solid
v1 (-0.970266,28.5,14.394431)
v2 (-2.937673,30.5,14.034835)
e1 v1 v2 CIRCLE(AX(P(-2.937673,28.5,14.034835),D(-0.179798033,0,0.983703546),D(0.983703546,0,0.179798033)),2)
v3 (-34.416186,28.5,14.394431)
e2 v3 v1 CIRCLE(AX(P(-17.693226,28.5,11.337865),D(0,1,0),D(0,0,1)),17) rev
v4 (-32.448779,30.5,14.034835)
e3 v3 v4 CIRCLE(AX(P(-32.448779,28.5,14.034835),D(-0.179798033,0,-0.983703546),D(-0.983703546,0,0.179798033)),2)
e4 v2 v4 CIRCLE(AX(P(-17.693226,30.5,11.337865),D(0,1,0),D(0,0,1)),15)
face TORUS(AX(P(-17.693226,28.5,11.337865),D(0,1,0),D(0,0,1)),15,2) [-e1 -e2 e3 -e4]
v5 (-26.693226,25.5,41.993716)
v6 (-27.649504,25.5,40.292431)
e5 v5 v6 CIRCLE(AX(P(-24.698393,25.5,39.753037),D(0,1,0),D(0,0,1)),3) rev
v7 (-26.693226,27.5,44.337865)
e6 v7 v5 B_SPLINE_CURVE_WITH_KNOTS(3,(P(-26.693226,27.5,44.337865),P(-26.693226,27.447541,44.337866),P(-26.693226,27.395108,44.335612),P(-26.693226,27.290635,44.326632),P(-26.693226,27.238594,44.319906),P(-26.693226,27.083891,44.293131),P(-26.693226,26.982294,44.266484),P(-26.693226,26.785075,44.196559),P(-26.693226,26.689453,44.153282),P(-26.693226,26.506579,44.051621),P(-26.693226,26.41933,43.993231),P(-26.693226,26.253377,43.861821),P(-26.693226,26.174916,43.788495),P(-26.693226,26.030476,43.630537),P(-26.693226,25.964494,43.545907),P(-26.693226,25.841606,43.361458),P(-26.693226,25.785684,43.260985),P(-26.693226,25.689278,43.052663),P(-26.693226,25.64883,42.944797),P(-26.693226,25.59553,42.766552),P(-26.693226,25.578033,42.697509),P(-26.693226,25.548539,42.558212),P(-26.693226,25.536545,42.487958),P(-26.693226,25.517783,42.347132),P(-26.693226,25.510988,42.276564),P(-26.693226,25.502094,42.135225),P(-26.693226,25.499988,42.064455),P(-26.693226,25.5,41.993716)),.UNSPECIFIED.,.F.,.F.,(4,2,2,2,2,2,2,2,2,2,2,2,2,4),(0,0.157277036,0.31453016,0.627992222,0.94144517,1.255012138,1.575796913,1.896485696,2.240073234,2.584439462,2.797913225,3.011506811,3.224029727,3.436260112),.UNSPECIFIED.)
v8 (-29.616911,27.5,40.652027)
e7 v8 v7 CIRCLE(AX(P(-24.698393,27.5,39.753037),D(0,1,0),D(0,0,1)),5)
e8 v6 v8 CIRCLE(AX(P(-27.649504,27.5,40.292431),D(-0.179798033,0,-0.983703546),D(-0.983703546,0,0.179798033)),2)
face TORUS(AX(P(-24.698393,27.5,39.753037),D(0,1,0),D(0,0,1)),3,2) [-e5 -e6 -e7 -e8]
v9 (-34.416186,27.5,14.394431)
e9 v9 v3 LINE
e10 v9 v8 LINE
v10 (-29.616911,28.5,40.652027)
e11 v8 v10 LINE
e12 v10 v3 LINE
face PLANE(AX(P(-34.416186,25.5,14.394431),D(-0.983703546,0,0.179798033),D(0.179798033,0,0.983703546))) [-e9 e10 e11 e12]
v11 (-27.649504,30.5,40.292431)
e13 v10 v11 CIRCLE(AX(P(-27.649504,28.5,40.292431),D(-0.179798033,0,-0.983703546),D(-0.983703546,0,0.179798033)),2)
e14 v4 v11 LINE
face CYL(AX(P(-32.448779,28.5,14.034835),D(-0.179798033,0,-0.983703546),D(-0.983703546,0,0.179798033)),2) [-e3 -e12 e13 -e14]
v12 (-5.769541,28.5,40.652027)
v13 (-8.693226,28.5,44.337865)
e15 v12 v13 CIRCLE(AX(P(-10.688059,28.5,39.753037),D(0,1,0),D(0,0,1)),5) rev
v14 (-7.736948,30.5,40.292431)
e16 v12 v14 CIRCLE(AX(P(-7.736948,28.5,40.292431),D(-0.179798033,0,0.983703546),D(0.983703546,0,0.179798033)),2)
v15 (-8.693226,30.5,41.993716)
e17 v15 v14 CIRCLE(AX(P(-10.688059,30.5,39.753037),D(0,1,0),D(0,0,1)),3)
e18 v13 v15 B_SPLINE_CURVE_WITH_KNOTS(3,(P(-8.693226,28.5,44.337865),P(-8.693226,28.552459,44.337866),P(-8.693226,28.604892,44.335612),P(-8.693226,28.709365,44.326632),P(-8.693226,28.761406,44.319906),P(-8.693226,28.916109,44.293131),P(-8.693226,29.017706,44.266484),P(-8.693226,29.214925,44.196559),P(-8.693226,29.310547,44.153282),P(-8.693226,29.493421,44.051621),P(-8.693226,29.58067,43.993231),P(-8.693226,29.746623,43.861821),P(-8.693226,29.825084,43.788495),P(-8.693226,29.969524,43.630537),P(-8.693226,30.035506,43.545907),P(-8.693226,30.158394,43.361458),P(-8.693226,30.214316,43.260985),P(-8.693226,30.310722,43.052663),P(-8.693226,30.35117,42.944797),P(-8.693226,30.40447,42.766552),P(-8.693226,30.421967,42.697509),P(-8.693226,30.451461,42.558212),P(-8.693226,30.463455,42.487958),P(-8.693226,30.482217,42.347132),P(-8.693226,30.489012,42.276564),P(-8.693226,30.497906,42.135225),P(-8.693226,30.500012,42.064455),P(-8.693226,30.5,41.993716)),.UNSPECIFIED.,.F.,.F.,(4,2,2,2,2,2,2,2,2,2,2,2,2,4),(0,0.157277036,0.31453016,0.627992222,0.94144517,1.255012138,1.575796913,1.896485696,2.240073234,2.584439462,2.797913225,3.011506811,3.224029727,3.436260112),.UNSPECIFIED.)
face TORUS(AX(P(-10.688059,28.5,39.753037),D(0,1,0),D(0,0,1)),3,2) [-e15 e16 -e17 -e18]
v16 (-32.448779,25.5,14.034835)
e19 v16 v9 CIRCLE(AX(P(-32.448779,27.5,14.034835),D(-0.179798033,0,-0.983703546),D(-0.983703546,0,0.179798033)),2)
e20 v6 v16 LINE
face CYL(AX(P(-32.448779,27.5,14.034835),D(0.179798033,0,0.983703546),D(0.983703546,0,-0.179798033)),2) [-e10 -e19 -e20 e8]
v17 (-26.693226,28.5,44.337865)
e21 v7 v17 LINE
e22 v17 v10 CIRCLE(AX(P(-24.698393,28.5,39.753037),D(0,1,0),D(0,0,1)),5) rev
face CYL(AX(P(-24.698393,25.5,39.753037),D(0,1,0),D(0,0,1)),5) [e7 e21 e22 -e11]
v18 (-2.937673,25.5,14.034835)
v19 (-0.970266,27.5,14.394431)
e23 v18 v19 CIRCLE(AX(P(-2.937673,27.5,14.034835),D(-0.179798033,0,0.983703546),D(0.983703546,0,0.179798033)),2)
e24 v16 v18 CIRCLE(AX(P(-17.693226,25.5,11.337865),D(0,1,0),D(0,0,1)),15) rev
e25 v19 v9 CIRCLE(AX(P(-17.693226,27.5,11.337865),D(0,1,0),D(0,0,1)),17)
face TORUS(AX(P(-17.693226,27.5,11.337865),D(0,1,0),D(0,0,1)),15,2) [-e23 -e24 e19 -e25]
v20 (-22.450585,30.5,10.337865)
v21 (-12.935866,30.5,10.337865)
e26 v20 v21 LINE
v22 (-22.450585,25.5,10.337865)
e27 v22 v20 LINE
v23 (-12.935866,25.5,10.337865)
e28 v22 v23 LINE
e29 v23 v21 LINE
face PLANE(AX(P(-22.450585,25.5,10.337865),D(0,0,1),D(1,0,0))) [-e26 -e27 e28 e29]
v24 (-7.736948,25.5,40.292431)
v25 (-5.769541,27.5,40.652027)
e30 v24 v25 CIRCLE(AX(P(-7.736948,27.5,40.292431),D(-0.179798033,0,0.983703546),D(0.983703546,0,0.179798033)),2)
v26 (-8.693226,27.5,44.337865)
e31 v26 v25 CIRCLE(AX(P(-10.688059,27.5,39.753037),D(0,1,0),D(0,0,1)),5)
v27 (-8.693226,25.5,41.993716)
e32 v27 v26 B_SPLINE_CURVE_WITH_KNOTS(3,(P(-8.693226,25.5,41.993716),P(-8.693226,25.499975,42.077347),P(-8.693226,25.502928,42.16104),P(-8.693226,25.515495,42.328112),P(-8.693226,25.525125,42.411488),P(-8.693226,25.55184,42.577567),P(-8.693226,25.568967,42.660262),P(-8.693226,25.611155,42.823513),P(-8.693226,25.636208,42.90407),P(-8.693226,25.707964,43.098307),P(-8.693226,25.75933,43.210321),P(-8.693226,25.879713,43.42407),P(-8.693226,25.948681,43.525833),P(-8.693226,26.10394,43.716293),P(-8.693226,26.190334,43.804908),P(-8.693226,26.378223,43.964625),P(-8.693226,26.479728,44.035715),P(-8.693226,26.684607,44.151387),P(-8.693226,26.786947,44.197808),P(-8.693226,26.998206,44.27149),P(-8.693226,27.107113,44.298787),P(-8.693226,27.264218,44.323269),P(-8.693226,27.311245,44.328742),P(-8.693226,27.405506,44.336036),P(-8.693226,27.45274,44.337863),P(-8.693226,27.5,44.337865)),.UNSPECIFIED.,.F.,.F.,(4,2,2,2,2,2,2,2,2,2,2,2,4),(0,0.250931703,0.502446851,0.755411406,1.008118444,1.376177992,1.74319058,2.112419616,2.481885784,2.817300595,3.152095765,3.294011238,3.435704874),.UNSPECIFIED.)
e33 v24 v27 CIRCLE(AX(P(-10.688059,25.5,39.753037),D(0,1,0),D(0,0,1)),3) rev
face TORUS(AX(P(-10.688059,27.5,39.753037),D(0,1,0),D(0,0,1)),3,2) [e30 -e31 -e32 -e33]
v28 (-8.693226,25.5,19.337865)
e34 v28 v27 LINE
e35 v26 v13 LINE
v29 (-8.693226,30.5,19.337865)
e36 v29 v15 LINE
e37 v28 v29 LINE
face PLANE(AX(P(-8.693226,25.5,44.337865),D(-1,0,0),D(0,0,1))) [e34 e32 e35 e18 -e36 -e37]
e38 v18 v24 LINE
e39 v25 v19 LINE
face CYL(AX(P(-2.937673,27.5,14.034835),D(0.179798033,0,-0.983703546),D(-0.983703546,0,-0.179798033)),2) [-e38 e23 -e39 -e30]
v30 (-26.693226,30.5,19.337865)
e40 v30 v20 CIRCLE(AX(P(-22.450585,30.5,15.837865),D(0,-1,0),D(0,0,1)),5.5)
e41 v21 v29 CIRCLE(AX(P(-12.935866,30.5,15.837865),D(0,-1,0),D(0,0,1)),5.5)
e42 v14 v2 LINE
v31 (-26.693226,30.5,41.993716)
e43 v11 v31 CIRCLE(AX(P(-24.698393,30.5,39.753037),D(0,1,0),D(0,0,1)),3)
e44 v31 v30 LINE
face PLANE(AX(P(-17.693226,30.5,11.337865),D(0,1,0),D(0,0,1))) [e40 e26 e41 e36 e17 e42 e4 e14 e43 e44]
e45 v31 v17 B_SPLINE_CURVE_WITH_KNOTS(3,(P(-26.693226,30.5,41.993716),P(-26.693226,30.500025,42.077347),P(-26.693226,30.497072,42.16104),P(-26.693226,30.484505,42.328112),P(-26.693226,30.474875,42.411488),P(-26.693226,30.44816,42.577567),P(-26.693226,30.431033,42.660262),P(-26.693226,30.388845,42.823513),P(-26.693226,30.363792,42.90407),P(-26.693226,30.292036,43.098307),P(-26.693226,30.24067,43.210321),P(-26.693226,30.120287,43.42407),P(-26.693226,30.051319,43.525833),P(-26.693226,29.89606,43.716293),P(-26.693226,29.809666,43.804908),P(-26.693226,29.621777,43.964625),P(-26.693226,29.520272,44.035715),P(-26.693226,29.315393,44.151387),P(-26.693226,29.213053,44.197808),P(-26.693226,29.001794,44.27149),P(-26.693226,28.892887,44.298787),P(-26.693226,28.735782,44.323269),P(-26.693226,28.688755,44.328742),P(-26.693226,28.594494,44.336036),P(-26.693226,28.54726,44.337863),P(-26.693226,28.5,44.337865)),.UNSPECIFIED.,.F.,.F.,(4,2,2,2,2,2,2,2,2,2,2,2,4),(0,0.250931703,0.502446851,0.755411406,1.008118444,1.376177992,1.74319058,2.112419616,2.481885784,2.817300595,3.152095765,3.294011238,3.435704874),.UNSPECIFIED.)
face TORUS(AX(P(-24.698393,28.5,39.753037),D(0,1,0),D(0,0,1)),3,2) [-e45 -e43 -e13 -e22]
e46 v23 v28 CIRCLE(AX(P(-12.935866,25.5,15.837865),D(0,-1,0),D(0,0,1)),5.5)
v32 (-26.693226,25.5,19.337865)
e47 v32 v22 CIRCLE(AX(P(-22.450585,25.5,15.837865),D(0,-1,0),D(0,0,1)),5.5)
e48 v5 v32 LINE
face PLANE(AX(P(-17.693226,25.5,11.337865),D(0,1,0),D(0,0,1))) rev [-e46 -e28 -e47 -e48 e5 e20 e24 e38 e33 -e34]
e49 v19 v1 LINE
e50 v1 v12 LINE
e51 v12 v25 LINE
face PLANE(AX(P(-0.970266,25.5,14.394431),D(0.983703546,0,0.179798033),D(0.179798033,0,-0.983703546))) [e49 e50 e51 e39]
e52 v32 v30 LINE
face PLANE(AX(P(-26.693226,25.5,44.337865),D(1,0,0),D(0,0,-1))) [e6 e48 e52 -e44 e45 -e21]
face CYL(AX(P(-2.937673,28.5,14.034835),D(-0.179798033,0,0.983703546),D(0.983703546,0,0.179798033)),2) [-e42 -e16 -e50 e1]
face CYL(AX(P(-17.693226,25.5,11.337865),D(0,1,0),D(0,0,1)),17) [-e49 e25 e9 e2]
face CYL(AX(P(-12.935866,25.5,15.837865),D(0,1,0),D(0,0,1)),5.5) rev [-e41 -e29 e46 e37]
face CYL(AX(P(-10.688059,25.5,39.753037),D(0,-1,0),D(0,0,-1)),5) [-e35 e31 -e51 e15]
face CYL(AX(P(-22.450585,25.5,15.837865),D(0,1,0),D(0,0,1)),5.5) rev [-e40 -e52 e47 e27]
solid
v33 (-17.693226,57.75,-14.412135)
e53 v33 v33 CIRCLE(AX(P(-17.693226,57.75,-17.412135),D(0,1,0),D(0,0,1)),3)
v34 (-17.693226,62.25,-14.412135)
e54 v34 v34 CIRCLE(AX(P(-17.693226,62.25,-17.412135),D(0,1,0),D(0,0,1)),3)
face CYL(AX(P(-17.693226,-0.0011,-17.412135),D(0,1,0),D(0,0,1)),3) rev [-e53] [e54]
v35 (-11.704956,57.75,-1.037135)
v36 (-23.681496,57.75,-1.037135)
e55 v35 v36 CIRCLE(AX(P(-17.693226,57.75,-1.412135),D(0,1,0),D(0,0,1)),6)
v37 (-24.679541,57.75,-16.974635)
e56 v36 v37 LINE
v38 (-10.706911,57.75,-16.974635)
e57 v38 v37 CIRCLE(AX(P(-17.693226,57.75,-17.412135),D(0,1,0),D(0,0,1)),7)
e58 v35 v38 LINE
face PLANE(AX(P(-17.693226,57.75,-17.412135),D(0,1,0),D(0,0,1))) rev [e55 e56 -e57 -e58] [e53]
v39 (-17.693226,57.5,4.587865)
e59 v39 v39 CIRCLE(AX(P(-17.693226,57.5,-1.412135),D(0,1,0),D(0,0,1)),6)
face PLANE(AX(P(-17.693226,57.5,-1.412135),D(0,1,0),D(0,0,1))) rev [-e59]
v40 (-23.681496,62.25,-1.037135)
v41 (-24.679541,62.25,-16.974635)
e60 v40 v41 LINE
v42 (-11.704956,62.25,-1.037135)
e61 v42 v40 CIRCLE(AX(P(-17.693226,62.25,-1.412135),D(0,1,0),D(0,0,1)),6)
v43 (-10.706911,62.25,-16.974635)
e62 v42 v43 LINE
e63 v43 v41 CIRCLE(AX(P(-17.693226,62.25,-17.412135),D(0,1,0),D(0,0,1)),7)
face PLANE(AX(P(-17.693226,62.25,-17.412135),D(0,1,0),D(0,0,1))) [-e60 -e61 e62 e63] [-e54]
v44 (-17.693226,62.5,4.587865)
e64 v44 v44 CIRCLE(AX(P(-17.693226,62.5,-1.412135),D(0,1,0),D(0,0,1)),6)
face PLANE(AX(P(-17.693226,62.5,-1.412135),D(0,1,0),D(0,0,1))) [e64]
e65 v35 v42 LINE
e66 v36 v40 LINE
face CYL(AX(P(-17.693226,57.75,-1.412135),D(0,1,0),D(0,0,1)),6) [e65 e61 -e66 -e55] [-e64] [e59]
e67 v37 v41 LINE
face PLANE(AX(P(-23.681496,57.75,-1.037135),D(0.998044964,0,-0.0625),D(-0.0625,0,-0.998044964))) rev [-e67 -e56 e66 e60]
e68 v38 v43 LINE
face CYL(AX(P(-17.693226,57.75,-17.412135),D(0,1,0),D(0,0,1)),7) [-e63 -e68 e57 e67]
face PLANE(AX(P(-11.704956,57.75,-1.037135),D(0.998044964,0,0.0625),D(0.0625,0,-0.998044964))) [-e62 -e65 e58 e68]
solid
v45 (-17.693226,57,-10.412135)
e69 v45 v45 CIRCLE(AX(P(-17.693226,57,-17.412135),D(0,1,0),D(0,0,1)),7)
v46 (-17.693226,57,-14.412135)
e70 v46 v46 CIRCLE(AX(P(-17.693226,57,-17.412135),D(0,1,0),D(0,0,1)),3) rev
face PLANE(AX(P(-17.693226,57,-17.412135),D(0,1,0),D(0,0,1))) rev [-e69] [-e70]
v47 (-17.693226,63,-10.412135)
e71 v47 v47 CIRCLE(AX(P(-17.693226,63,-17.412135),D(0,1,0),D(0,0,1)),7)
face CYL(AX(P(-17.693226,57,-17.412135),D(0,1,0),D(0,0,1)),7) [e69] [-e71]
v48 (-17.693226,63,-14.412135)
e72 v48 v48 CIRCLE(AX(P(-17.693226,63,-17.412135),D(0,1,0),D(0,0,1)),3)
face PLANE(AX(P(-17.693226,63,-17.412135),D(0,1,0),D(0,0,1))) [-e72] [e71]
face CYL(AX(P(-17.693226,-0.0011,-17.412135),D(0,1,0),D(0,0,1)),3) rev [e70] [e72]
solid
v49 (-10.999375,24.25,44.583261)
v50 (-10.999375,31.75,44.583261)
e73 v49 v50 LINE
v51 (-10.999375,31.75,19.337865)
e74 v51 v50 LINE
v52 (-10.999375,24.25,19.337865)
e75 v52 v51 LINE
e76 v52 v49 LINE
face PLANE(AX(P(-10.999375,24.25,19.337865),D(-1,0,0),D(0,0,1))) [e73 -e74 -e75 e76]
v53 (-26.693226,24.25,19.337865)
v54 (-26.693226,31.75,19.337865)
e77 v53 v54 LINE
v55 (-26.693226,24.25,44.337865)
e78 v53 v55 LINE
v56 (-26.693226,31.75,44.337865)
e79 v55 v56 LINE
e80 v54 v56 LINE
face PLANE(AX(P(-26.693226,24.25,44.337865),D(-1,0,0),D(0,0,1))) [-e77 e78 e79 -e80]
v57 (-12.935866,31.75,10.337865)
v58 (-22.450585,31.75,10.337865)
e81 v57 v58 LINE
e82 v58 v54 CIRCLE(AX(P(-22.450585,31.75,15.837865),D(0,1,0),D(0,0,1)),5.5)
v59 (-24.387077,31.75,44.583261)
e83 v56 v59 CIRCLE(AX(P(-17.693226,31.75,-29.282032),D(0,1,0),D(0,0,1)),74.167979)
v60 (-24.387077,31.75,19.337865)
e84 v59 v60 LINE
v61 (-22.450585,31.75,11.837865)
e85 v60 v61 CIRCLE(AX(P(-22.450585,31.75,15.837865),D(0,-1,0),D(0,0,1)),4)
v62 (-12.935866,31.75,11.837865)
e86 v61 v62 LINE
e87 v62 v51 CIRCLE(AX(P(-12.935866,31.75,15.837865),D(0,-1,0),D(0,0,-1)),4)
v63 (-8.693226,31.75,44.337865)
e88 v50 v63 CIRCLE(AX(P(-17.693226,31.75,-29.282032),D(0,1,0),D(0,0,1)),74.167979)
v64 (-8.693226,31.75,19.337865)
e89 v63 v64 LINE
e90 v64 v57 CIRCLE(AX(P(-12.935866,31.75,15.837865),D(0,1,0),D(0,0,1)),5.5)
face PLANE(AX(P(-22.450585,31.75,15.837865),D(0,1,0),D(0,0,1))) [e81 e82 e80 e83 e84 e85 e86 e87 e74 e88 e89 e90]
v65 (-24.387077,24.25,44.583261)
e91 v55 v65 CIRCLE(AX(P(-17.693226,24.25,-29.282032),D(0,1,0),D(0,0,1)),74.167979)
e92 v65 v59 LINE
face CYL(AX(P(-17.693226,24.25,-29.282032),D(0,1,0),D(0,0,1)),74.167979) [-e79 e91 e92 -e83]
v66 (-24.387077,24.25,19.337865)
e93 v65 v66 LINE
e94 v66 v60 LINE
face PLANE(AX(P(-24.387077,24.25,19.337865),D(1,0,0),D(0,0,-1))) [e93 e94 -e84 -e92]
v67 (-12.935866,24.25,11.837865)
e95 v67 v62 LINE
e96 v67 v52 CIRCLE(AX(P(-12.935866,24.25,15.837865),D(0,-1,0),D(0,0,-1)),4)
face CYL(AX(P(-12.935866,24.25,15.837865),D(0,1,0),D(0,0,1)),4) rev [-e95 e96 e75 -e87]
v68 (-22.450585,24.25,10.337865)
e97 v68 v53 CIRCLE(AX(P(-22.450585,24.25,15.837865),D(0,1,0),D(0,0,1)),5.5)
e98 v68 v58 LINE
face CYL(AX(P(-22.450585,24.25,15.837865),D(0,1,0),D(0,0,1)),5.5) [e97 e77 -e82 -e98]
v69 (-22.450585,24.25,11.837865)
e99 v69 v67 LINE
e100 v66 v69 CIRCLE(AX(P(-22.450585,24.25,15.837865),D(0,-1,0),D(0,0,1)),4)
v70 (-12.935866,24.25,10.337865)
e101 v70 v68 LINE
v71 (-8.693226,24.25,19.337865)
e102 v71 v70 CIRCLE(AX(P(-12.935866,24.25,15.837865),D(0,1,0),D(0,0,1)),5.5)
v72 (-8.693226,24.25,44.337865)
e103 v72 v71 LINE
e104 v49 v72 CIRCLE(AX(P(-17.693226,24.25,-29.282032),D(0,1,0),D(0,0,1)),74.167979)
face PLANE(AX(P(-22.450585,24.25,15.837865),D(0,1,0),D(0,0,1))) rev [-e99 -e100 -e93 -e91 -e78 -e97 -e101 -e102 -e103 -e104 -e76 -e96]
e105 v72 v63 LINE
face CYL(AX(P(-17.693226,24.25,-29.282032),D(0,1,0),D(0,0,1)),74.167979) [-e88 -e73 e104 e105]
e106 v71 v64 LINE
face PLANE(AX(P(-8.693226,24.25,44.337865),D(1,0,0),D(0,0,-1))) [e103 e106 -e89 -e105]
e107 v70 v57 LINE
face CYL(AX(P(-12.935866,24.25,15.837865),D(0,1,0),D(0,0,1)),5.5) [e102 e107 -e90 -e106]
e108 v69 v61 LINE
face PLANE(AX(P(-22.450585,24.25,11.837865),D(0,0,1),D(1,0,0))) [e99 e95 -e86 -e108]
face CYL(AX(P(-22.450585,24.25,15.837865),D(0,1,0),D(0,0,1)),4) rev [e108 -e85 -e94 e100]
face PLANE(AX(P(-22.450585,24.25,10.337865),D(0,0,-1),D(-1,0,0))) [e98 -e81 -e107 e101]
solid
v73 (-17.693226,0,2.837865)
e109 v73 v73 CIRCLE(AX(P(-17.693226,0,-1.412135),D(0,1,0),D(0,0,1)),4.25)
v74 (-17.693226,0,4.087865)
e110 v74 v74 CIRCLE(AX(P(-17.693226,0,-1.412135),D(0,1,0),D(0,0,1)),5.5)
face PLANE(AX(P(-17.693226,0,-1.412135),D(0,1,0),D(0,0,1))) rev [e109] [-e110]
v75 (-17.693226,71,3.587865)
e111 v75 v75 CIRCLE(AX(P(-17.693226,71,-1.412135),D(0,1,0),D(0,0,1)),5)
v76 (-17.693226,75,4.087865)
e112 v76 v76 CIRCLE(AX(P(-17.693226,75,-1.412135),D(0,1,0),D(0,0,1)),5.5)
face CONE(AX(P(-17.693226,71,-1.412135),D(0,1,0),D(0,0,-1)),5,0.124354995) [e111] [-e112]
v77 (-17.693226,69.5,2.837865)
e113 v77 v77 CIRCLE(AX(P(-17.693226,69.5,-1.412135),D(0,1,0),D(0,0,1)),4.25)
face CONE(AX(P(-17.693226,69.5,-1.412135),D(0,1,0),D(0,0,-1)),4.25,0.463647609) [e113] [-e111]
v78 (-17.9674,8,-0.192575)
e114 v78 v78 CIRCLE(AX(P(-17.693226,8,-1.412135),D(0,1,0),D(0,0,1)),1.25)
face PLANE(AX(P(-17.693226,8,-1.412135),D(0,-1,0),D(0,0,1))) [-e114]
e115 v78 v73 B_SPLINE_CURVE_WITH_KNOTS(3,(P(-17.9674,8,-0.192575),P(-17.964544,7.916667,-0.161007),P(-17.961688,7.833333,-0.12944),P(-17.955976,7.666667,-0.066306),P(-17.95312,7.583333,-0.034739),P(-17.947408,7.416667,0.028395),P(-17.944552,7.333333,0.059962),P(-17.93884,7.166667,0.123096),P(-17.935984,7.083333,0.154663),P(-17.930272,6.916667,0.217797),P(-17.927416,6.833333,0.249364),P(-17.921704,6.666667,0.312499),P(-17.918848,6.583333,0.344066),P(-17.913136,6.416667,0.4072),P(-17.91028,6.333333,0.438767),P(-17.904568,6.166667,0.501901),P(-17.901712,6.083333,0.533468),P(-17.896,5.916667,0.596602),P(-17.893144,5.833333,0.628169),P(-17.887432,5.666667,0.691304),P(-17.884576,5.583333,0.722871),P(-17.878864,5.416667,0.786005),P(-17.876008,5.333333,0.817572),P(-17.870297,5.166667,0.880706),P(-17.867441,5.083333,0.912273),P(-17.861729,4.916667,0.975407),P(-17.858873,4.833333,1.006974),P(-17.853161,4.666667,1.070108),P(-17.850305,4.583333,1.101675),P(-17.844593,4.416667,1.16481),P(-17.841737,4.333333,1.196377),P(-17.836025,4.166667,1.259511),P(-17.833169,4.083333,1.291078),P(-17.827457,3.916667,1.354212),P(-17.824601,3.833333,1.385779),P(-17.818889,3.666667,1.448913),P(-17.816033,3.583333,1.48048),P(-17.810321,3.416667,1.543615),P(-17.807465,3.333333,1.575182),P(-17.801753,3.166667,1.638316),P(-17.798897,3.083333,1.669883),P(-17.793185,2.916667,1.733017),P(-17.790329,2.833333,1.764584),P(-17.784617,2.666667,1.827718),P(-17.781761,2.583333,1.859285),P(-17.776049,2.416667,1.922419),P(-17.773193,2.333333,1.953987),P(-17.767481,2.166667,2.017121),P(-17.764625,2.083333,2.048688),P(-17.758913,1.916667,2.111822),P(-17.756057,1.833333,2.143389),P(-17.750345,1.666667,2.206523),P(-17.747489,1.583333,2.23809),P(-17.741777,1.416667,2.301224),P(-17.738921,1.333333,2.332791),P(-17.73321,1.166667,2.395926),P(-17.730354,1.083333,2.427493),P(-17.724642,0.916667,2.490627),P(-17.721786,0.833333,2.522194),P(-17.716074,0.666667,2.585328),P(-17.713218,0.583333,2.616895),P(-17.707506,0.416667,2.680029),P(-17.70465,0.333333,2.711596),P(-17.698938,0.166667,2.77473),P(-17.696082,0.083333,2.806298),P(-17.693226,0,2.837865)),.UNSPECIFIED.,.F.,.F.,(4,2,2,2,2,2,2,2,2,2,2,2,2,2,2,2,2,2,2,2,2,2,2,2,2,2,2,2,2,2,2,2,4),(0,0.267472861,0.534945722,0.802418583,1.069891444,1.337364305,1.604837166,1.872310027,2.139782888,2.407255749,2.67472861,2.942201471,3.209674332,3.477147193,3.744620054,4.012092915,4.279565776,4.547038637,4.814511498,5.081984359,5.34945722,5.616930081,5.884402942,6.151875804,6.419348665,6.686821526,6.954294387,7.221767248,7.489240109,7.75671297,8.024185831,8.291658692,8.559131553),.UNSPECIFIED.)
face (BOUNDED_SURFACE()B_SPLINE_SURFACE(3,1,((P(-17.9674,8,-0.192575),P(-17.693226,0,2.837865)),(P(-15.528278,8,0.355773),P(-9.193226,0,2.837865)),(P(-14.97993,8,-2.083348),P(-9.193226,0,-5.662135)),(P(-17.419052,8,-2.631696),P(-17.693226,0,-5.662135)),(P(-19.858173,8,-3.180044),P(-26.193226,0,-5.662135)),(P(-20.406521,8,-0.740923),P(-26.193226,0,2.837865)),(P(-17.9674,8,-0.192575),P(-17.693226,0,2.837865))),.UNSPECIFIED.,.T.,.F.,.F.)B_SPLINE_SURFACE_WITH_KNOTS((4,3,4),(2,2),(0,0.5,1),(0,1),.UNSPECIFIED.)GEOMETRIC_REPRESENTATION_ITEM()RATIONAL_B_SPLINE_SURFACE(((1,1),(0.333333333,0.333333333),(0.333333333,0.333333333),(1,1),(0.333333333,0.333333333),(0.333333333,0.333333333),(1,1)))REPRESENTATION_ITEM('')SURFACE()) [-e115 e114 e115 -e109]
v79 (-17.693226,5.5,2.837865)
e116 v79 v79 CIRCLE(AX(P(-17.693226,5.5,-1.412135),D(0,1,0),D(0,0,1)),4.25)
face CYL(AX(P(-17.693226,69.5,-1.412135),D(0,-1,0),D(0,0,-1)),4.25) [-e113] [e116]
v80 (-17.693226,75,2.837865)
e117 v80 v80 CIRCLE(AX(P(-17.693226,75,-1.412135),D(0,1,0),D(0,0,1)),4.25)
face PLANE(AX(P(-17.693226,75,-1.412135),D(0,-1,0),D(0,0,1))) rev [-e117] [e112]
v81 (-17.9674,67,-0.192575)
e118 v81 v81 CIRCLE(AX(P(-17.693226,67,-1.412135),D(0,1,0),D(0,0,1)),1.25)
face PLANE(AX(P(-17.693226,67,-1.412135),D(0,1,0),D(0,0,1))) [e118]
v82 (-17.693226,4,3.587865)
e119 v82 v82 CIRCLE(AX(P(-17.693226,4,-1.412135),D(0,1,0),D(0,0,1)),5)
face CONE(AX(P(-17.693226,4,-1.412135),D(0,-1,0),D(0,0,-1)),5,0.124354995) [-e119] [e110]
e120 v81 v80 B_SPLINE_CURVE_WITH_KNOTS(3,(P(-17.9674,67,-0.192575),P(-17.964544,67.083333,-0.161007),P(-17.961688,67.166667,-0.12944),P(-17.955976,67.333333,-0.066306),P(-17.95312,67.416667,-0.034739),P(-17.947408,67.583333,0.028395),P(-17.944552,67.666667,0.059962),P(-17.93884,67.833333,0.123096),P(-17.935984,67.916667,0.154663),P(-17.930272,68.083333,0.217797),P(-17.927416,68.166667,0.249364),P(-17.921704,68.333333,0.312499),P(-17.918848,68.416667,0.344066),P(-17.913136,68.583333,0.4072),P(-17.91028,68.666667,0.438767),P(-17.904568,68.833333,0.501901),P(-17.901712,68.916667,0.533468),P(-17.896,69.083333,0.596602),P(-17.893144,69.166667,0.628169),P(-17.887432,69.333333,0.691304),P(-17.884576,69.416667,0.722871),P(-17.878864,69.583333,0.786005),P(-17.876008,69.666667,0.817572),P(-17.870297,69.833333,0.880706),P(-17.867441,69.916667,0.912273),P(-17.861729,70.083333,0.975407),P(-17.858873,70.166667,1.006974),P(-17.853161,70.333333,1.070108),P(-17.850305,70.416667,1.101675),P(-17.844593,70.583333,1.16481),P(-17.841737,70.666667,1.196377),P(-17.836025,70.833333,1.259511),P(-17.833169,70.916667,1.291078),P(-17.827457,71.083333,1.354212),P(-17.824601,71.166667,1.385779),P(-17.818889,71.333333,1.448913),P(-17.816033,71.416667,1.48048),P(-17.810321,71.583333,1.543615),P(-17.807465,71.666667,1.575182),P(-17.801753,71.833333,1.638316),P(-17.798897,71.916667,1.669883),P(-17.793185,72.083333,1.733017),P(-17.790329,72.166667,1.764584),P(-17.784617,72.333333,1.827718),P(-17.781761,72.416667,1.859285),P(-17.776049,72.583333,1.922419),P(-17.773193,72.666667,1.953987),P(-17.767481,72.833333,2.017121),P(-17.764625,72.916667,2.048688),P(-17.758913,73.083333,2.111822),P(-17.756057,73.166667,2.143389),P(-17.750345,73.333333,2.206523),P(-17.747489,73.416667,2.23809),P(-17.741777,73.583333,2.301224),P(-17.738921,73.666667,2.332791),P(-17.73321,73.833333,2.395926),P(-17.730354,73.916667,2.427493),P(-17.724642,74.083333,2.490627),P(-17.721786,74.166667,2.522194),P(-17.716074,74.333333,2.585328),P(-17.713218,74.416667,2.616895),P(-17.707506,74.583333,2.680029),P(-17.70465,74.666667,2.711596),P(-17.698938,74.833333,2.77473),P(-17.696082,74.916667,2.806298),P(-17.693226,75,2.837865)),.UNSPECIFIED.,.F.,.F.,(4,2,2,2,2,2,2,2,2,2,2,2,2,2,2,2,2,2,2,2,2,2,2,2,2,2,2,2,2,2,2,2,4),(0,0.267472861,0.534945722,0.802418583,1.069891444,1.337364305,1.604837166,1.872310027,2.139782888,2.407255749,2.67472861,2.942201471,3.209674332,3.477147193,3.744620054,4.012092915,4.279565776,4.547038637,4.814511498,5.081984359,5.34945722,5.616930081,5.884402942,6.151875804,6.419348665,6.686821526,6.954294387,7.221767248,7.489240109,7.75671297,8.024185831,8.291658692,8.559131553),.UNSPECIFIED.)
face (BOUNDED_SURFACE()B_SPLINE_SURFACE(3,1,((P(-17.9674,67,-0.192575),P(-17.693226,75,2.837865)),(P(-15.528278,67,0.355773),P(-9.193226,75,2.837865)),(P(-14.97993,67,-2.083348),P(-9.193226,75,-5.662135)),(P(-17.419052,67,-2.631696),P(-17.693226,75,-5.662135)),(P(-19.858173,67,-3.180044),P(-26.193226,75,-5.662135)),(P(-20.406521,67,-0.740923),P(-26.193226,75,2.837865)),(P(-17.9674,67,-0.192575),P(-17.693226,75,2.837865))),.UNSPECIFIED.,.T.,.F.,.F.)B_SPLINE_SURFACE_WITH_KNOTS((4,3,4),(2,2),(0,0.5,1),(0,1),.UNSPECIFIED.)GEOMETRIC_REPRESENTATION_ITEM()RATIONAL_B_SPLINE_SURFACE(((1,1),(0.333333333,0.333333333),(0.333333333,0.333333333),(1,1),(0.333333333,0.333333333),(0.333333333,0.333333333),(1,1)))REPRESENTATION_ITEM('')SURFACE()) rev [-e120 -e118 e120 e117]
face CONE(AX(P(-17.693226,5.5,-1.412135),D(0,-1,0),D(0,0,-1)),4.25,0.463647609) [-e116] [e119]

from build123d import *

# Parameters (mm, degrees)
CROQUIS2_R                   = 5
CROQUIS1_R                   = 5.5
CROQUIS2_2_R                 = 5
CROQUIS3_R                   = 4.25
CROQUIS3_2_R                 = 4.25
SALIENTE_EXTRUIR1_DEPTH      = 64
SALIENTE_EXTRUIR2_DEPTH      = 2.5
SALIENTE_EXTRUIR2_DEPTH_BACK = 2.5
REDONDEO1_R                  = 5
REDONDEO2_R                  = 5
REDONDEO3_R                  = 2
REDONDEO4_R                  = 2
SALIENTE_EXTRUIR3_DEPTH      = 3.75
SALIENTE_EXTRUIR3_DEPTH_BACK = 3.75
SALIENTE_EXTRUIR4_DEPTH      = 3
SALIENTE_EXTRUIR4_DEPTH_BACK = 3
CROQUIS9_R                   = 7
SALIENTE_EXTRUIR5_DEPTH      = 2.25
SALIENTE_EXTRUIR5_DEPTH_BACK = 2.25
SALIENTE_EXTRUIR6_DEPTH      = 2.5
SALIENTE_EXTRUIR6_DEPTH_BACK = 2.5
CROQUIS8_R                   = 6
CORTAR_EXTRUIR1_START        = -6
CROQUIS11_R                  = 3
CORTAR_EXTRUIR1_DEPTH        = 6


with BuildPart() as part:
    # Croquis2 → Recubrir1 section 0
    with BuildSketch(Plane(origin=(0, 4, 0), x_dir=(1, 0, 0), z_dir=(0, 1, 0))):
        with Locations((-17.693226, 1.412135)):
            Circle(CROQUIS2_R)
    # Croquis1 → Recubrir1 section 1
    with BuildSketch(Plane(origin=(0, 0, 0), x_dir=(1, 0, 0), z_dir=(0, 1, 0))):
        with Locations((-17.693226, 1.412135)):
            Circle(CROQUIS1_R)
    recubrir1 = loft()

    # Croquis2<2> → Recubrir3 section 0
    with BuildSketch(Plane(origin=(0, 4, 0), x_dir=(1, 0, 0), z_dir=(0, 1, 0))):
        with Locations((-17.693226, 1.412135)):
            Circle(CROQUIS2_2_R)
    # Croquis3 → Recubrir3 section 1
    with BuildSketch(Plane(origin=(0, 5.5, 0), x_dir=(1, 0, 0), z_dir=(0, 1, 0))):
        with Locations((-17.693226, 1.412135)):
            Circle(CROQUIS3_R)
    recubrir3 = loft()

    # Croquis3<2> → Saliente-Extruir1 (add)
    with BuildSketch(Plane(origin=(0, 5.5, 0), x_dir=(1, 0, 0), z_dir=(0, 1, 0))):
        with Locations(Location((-17.693226, 1.412135, 0), (0, 0, 270))):
            Circle(CROQUIS3_2_R)
    extrude(amount=SALIENTE_EXTRUIR1_DEPTH)

    # Simetría1: Recubrir3 across plane
    add(recubrir3.mirror(Plane.ZX.offset(37.5)))

    # Simetría2: Recubrir1 across plane
    add(recubrir1.mirror(Plane.ZX.offset(37.5)))

    # Cortar-Recubrir1: read off the stored shape, not the designer's step
    # Cortar-Recubrir1: loft between two sections, ruled curve by curve
    cortar_recubrir1_from = [
        Edge.make_bspline([(-17.9674, 67, -0.192575), (-15.528278, 67, 0.355773), (-14.97993, 67, -2.083348), (-17.419052, 67, -2.631696), (-19.858173, 67, -3.180044), (-20.406521, 67, -0.740923), (-17.9674, 67, -0.192575)], [0, 0, 0, 0, 0.5, 0.5, 0.5, 1, 1, 1, 1], 3, [1, 0.333333, 0.333333, 1, 0.333333, 0.333333, 1]),
    ]
    cortar_recubrir1_to = [
        Edge.make_bspline([(-17.693226, 75, 2.837865), (-9.193226, 75, 2.837865), (-9.193226, 75, -5.662135), (-17.693226, 75, -5.662135), (-26.193226, 75, -5.662135), (-26.193226, 75, 2.837865), (-17.693226, 75, 2.837865)], [0, 0, 0, 0, 0.5, 0.5, 0.5, 1, 1, 1, 1], 3, [1, 0.333333, 0.333333, 1, 0.333333, 0.333333, 1]),
    ]
    cortar_recubrir1 = Solid(Shell([*[Face.make_surface_from_curves(cortar_recubrir1_from[k], cortar_recubrir1_to[k]) for k in range(1)], Face(Wire(cortar_recubrir1_from)), Face(Wire(cortar_recubrir1_to))]))
    add(cortar_recubrir1, mode=Mode.SUBTRACT)

    # Simetría3: Cortar-Recubrir1 across plane
    add(cortar_recubrir1.mirror(Plane.ZX.offset(37.5)), mode=Mode.SUBTRACT)


with BuildPart() as body_2:
    # Croquis5 → Saliente-Extruir2 (new, two sides: drawn at the far end of the back side and taken through both)
    with BuildSketch(Plane(origin=(0, 28, 0), x_dir=(1, 0, 0), z_dir=(0, 1, 0)).offset(-SALIENTE_EXTRUIR2_DEPTH_BACK)):
        with BuildLine():
            Line((-0.970266, -14.394431), (-6.443226, -44.337865))
            Line((-6.443226, -44.337865), (-8.693226, -44.337865))
            Line((-8.693226, -44.337865), (-8.693226, -19.337865))
            ThreePointArc((-8.693226, -19.337865), (-7.960929, -13.492657), (-12.935866, -10.337865))
            Line((-12.935866, -10.337865), (-22.450585, -10.337865))
            ThreePointArc((-22.450585, -10.337865), (-27.425522, -13.492657), (-26.693226, -19.337865))
            Line((-26.693226, -19.337865), (-26.693226, -44.337865))
            Line((-26.693226, -44.337865), (-28.943226, -44.337865))
            Line((-28.943226, -44.337865), (-34.416186, -14.394431))
            ThreePointArc((-34.416186, -14.394431), (-17.693226, 5.662135), (-0.970266, -14.394431))
        make_face()
    extrude(amount=SALIENTE_EXTRUIR2_DEPTH + SALIENTE_EXTRUIR2_DEPTH_BACK)

    # Redondeo1
    # the kernel refuses this fillet: 5 mm, written as the material it takes off along each edge
    with BuildSketch(Plane(origin=(-6.443226, 39.867246, 44.337865), x_dir=(0.1797980334285227, 0, -0.9837035463874448), z_dir=(0, -1, 0))) as redondeo1_piece_1:
        with BuildLine():
            CenterArc((3.746898, -5), REDONDEO1_R, 90, 56.128415)
            Line((-0.404546, -2.213333), (-0.487574, -2.1576))
            ThreePointArc((-0.487574, -2.1576), (-0.300643, -1.088687), (-0.09837, 0.01798))
            Line((-0.09837, 0.01798), (0, 0.1))
            Line((0, 0.1), (3.746898, 0.1))
            Line((3.746898, 0.1), (3.746898, 0))
        make_face()
    extrude(amount=23.734492, mode=Mode.SUBTRACT)

    # Redondeo2
    # the kernel refuses this fillet: 5 mm, written as the material it takes off along each edge
    with BuildSketch(Plane(origin=(-28.943226, 16.132754, 44.337865), x_dir=(-0.17979803342852285, 0, -0.9837035463874448), z_dir=(0, 1, 0))) as redondeo2_piece_1:
        with BuildLine():
            CenterArc((3.746898, -5), REDONDEO2_R, 90, 56.128415)
            Line((-0.404546, -2.213333), (-0.487574, -2.1576))
            ThreePointArc((-0.487574, -2.1576), (-0.300643, -1.088687), (-0.09837, 0.01798))
            Line((-0.09837, 0.01798), (0, 0.1))
            Line((0, 0.1), (3.746898, 0.1))
            Line((3.746898, 0.1), (3.746898, 0))
        make_face()
    extrude(amount=23.734492, mode=Mode.SUBTRACT)

    # Redondeo3
    redondeo3_edges = [body_2.edges().sort_by_distance(p)[0] for p in [
        (-17.693226, 30.5, -5.662135),
        (-32.016548, 30.5, 27.523229),
        (-3.369903, 30.5, 27.523229),
        (-6.770795, 30.5, 42.860294),
        (-28.615656, 30.5, 42.860294),
    ]]
    fillet(redondeo3_edges, radius=REDONDEO3_R)

    # Redondeo4
    redondeo4_edges = [body_2.edges().sort_by_distance(p)[0] for p in [
        (-17.693226, 25.5, -5.662135),
        (-3.369903, 25.5, 27.523229),
        (-6.770795, 25.5, 42.860294),
        (-28.615656, 25.5, 42.860294),
        (-32.016548, 25.5, 27.523229),
    ]]
    fillet(redondeo4_edges, radius=REDONDEO4_R)


with BuildPart() as body_3:
    # Croquis6 → Saliente-Extruir3 (new, two sides: drawn at the far end of the back side and taken through both)
    with BuildSketch(Plane(origin=(0, 28, 0), x_dir=(1, 0, 0), z_dir=(0, 1, 0)).offset(-SALIENTE_EXTRUIR3_DEPTH_BACK)):
        with BuildLine():
            Line((-22.450585, -11.837865), (-12.935866, -11.837865))
            ThreePointArc((-12.935866, -11.837865), (-9.062883, -14.837865), (-10.999375, -19.337865))
            Line((-10.999375, -19.337865), (-10.999375, -44.583261))
            ThreePointArc((-10.999375, -44.583261), (-9.845341, -44.469577), (-8.693226, -44.337865))
            Line((-8.693226, -44.337865), (-8.693226, -19.337865))
            ThreePointArc((-8.693226, -19.337865), (-7.960929, -13.492657), (-12.935866, -10.337865))
            Line((-12.935866, -10.337865), (-22.450585, -10.337865))
            ThreePointArc((-22.450585, -10.337865), (-27.425522, -13.492657), (-26.693226, -19.337865))
            Line((-26.693226, -19.337865), (-26.693226, -44.337865))
            ThreePointArc((-26.693226, -44.337865), (-25.541111, -44.469577), (-24.387077, -44.583261))
            Line((-24.387077, -44.583261), (-24.387077, -19.337865))
            ThreePointArc((-24.387077, -19.337865), (-26.323568, -14.837865), (-22.450585, -11.837865))
        make_face()
    extrude(amount=SALIENTE_EXTRUIR3_DEPTH + SALIENTE_EXTRUIR3_DEPTH_BACK)


with BuildPart() as body_4:
    # Croquis9 → Saliente-Extruir4 (new, two sides: drawn at the far end of the back side and taken through both)
    with BuildSketch(Plane(origin=(0, 60, 0), x_dir=(1, 0, 0), z_dir=(0, 1, 0)).offset(-SALIENTE_EXTRUIR4_DEPTH_BACK)):
        with Locations(Location((-17.693226, 17.412135, 0), (0, 0, 270))):
            Circle(CROQUIS9_R)
    extrude(amount=SALIENTE_EXTRUIR4_DEPTH + SALIENTE_EXTRUIR4_DEPTH_BACK)


with BuildPart() as body_5:
    # Croquis7 → Saliente-Extruir5 (new, two sides: drawn at the far end of the back side and taken through both)
    with BuildSketch(Plane(origin=(0, 60, 0), x_dir=(1, 0, 0), z_dir=(0, 1, 0)).offset(-SALIENTE_EXTRUIR5_DEPTH_BACK)):
        with BuildLine():
            Line((-23.681496, 1.037135), (-24.679541, 16.974635))
            ThreePointArc((-24.679541, 16.974635), (-17.693226, 24.412135), (-10.706911, 16.974635))
            Line((-10.706911, 16.974635), (-11.704956, 1.037135))
            ThreePointArc((-11.704956, 1.037135), (-17.693226, -4.587865), (-23.681496, 1.037135))
        make_face()
    extrude(amount=SALIENTE_EXTRUIR5_DEPTH + SALIENTE_EXTRUIR5_DEPTH_BACK)

    # Croquis8 → Saliente-Extruir6 (add, two sides: drawn at the far end of the back side and taken through both)
    with BuildSketch(Plane(origin=(0, 60, 0), x_dir=(1, 0, 0), z_dir=(0, 1, 0)).offset(-SALIENTE_EXTRUIR6_DEPTH_BACK)):
        with Locations(Location((-17.693226, 1.412135, 0), (0, 0, 270))):
            Circle(CROQUIS8_R)
    extrude(amount=SALIENTE_EXTRUIR6_DEPTH + SALIENTE_EXTRUIR6_DEPTH_BACK)


with BuildPart() as cortar_extruir1_tool:
    # Croquis11 → Cortar-Extruir1 (new body)
    with BuildSketch(Plane(origin=(0, 63, 0), x_dir=(1, 0, 0), z_dir=(0, 1, 0)).offset(CORTAR_EXTRUIR1_START)):
        with Locations(Location((-17.693226, 17.412135, 0), (0, 0, 270))):
            Circle(CROQUIS11_R)
    extrude(amount=CORTAR_EXTRUIR1_DEPTH)


with BuildPart() as body_4_1:
    add(body_4.part)

    # Cortar-Extruir1: cut by cortar_extruir1_tool
    add(cortar_extruir1_tool.part, mode=Mode.SUBTRACT)


with BuildPart() as body_5_1:
    add(body_5.part)

    # Cortar-Extruir1: cut by cortar_extruir1_tool
    add(cortar_extruir1_tool.part, mode=Mode.SUBTRACT)


solid = Compound([part.part, body_2.part, body_3.part, body_4_1.part, body_5_1.part])
